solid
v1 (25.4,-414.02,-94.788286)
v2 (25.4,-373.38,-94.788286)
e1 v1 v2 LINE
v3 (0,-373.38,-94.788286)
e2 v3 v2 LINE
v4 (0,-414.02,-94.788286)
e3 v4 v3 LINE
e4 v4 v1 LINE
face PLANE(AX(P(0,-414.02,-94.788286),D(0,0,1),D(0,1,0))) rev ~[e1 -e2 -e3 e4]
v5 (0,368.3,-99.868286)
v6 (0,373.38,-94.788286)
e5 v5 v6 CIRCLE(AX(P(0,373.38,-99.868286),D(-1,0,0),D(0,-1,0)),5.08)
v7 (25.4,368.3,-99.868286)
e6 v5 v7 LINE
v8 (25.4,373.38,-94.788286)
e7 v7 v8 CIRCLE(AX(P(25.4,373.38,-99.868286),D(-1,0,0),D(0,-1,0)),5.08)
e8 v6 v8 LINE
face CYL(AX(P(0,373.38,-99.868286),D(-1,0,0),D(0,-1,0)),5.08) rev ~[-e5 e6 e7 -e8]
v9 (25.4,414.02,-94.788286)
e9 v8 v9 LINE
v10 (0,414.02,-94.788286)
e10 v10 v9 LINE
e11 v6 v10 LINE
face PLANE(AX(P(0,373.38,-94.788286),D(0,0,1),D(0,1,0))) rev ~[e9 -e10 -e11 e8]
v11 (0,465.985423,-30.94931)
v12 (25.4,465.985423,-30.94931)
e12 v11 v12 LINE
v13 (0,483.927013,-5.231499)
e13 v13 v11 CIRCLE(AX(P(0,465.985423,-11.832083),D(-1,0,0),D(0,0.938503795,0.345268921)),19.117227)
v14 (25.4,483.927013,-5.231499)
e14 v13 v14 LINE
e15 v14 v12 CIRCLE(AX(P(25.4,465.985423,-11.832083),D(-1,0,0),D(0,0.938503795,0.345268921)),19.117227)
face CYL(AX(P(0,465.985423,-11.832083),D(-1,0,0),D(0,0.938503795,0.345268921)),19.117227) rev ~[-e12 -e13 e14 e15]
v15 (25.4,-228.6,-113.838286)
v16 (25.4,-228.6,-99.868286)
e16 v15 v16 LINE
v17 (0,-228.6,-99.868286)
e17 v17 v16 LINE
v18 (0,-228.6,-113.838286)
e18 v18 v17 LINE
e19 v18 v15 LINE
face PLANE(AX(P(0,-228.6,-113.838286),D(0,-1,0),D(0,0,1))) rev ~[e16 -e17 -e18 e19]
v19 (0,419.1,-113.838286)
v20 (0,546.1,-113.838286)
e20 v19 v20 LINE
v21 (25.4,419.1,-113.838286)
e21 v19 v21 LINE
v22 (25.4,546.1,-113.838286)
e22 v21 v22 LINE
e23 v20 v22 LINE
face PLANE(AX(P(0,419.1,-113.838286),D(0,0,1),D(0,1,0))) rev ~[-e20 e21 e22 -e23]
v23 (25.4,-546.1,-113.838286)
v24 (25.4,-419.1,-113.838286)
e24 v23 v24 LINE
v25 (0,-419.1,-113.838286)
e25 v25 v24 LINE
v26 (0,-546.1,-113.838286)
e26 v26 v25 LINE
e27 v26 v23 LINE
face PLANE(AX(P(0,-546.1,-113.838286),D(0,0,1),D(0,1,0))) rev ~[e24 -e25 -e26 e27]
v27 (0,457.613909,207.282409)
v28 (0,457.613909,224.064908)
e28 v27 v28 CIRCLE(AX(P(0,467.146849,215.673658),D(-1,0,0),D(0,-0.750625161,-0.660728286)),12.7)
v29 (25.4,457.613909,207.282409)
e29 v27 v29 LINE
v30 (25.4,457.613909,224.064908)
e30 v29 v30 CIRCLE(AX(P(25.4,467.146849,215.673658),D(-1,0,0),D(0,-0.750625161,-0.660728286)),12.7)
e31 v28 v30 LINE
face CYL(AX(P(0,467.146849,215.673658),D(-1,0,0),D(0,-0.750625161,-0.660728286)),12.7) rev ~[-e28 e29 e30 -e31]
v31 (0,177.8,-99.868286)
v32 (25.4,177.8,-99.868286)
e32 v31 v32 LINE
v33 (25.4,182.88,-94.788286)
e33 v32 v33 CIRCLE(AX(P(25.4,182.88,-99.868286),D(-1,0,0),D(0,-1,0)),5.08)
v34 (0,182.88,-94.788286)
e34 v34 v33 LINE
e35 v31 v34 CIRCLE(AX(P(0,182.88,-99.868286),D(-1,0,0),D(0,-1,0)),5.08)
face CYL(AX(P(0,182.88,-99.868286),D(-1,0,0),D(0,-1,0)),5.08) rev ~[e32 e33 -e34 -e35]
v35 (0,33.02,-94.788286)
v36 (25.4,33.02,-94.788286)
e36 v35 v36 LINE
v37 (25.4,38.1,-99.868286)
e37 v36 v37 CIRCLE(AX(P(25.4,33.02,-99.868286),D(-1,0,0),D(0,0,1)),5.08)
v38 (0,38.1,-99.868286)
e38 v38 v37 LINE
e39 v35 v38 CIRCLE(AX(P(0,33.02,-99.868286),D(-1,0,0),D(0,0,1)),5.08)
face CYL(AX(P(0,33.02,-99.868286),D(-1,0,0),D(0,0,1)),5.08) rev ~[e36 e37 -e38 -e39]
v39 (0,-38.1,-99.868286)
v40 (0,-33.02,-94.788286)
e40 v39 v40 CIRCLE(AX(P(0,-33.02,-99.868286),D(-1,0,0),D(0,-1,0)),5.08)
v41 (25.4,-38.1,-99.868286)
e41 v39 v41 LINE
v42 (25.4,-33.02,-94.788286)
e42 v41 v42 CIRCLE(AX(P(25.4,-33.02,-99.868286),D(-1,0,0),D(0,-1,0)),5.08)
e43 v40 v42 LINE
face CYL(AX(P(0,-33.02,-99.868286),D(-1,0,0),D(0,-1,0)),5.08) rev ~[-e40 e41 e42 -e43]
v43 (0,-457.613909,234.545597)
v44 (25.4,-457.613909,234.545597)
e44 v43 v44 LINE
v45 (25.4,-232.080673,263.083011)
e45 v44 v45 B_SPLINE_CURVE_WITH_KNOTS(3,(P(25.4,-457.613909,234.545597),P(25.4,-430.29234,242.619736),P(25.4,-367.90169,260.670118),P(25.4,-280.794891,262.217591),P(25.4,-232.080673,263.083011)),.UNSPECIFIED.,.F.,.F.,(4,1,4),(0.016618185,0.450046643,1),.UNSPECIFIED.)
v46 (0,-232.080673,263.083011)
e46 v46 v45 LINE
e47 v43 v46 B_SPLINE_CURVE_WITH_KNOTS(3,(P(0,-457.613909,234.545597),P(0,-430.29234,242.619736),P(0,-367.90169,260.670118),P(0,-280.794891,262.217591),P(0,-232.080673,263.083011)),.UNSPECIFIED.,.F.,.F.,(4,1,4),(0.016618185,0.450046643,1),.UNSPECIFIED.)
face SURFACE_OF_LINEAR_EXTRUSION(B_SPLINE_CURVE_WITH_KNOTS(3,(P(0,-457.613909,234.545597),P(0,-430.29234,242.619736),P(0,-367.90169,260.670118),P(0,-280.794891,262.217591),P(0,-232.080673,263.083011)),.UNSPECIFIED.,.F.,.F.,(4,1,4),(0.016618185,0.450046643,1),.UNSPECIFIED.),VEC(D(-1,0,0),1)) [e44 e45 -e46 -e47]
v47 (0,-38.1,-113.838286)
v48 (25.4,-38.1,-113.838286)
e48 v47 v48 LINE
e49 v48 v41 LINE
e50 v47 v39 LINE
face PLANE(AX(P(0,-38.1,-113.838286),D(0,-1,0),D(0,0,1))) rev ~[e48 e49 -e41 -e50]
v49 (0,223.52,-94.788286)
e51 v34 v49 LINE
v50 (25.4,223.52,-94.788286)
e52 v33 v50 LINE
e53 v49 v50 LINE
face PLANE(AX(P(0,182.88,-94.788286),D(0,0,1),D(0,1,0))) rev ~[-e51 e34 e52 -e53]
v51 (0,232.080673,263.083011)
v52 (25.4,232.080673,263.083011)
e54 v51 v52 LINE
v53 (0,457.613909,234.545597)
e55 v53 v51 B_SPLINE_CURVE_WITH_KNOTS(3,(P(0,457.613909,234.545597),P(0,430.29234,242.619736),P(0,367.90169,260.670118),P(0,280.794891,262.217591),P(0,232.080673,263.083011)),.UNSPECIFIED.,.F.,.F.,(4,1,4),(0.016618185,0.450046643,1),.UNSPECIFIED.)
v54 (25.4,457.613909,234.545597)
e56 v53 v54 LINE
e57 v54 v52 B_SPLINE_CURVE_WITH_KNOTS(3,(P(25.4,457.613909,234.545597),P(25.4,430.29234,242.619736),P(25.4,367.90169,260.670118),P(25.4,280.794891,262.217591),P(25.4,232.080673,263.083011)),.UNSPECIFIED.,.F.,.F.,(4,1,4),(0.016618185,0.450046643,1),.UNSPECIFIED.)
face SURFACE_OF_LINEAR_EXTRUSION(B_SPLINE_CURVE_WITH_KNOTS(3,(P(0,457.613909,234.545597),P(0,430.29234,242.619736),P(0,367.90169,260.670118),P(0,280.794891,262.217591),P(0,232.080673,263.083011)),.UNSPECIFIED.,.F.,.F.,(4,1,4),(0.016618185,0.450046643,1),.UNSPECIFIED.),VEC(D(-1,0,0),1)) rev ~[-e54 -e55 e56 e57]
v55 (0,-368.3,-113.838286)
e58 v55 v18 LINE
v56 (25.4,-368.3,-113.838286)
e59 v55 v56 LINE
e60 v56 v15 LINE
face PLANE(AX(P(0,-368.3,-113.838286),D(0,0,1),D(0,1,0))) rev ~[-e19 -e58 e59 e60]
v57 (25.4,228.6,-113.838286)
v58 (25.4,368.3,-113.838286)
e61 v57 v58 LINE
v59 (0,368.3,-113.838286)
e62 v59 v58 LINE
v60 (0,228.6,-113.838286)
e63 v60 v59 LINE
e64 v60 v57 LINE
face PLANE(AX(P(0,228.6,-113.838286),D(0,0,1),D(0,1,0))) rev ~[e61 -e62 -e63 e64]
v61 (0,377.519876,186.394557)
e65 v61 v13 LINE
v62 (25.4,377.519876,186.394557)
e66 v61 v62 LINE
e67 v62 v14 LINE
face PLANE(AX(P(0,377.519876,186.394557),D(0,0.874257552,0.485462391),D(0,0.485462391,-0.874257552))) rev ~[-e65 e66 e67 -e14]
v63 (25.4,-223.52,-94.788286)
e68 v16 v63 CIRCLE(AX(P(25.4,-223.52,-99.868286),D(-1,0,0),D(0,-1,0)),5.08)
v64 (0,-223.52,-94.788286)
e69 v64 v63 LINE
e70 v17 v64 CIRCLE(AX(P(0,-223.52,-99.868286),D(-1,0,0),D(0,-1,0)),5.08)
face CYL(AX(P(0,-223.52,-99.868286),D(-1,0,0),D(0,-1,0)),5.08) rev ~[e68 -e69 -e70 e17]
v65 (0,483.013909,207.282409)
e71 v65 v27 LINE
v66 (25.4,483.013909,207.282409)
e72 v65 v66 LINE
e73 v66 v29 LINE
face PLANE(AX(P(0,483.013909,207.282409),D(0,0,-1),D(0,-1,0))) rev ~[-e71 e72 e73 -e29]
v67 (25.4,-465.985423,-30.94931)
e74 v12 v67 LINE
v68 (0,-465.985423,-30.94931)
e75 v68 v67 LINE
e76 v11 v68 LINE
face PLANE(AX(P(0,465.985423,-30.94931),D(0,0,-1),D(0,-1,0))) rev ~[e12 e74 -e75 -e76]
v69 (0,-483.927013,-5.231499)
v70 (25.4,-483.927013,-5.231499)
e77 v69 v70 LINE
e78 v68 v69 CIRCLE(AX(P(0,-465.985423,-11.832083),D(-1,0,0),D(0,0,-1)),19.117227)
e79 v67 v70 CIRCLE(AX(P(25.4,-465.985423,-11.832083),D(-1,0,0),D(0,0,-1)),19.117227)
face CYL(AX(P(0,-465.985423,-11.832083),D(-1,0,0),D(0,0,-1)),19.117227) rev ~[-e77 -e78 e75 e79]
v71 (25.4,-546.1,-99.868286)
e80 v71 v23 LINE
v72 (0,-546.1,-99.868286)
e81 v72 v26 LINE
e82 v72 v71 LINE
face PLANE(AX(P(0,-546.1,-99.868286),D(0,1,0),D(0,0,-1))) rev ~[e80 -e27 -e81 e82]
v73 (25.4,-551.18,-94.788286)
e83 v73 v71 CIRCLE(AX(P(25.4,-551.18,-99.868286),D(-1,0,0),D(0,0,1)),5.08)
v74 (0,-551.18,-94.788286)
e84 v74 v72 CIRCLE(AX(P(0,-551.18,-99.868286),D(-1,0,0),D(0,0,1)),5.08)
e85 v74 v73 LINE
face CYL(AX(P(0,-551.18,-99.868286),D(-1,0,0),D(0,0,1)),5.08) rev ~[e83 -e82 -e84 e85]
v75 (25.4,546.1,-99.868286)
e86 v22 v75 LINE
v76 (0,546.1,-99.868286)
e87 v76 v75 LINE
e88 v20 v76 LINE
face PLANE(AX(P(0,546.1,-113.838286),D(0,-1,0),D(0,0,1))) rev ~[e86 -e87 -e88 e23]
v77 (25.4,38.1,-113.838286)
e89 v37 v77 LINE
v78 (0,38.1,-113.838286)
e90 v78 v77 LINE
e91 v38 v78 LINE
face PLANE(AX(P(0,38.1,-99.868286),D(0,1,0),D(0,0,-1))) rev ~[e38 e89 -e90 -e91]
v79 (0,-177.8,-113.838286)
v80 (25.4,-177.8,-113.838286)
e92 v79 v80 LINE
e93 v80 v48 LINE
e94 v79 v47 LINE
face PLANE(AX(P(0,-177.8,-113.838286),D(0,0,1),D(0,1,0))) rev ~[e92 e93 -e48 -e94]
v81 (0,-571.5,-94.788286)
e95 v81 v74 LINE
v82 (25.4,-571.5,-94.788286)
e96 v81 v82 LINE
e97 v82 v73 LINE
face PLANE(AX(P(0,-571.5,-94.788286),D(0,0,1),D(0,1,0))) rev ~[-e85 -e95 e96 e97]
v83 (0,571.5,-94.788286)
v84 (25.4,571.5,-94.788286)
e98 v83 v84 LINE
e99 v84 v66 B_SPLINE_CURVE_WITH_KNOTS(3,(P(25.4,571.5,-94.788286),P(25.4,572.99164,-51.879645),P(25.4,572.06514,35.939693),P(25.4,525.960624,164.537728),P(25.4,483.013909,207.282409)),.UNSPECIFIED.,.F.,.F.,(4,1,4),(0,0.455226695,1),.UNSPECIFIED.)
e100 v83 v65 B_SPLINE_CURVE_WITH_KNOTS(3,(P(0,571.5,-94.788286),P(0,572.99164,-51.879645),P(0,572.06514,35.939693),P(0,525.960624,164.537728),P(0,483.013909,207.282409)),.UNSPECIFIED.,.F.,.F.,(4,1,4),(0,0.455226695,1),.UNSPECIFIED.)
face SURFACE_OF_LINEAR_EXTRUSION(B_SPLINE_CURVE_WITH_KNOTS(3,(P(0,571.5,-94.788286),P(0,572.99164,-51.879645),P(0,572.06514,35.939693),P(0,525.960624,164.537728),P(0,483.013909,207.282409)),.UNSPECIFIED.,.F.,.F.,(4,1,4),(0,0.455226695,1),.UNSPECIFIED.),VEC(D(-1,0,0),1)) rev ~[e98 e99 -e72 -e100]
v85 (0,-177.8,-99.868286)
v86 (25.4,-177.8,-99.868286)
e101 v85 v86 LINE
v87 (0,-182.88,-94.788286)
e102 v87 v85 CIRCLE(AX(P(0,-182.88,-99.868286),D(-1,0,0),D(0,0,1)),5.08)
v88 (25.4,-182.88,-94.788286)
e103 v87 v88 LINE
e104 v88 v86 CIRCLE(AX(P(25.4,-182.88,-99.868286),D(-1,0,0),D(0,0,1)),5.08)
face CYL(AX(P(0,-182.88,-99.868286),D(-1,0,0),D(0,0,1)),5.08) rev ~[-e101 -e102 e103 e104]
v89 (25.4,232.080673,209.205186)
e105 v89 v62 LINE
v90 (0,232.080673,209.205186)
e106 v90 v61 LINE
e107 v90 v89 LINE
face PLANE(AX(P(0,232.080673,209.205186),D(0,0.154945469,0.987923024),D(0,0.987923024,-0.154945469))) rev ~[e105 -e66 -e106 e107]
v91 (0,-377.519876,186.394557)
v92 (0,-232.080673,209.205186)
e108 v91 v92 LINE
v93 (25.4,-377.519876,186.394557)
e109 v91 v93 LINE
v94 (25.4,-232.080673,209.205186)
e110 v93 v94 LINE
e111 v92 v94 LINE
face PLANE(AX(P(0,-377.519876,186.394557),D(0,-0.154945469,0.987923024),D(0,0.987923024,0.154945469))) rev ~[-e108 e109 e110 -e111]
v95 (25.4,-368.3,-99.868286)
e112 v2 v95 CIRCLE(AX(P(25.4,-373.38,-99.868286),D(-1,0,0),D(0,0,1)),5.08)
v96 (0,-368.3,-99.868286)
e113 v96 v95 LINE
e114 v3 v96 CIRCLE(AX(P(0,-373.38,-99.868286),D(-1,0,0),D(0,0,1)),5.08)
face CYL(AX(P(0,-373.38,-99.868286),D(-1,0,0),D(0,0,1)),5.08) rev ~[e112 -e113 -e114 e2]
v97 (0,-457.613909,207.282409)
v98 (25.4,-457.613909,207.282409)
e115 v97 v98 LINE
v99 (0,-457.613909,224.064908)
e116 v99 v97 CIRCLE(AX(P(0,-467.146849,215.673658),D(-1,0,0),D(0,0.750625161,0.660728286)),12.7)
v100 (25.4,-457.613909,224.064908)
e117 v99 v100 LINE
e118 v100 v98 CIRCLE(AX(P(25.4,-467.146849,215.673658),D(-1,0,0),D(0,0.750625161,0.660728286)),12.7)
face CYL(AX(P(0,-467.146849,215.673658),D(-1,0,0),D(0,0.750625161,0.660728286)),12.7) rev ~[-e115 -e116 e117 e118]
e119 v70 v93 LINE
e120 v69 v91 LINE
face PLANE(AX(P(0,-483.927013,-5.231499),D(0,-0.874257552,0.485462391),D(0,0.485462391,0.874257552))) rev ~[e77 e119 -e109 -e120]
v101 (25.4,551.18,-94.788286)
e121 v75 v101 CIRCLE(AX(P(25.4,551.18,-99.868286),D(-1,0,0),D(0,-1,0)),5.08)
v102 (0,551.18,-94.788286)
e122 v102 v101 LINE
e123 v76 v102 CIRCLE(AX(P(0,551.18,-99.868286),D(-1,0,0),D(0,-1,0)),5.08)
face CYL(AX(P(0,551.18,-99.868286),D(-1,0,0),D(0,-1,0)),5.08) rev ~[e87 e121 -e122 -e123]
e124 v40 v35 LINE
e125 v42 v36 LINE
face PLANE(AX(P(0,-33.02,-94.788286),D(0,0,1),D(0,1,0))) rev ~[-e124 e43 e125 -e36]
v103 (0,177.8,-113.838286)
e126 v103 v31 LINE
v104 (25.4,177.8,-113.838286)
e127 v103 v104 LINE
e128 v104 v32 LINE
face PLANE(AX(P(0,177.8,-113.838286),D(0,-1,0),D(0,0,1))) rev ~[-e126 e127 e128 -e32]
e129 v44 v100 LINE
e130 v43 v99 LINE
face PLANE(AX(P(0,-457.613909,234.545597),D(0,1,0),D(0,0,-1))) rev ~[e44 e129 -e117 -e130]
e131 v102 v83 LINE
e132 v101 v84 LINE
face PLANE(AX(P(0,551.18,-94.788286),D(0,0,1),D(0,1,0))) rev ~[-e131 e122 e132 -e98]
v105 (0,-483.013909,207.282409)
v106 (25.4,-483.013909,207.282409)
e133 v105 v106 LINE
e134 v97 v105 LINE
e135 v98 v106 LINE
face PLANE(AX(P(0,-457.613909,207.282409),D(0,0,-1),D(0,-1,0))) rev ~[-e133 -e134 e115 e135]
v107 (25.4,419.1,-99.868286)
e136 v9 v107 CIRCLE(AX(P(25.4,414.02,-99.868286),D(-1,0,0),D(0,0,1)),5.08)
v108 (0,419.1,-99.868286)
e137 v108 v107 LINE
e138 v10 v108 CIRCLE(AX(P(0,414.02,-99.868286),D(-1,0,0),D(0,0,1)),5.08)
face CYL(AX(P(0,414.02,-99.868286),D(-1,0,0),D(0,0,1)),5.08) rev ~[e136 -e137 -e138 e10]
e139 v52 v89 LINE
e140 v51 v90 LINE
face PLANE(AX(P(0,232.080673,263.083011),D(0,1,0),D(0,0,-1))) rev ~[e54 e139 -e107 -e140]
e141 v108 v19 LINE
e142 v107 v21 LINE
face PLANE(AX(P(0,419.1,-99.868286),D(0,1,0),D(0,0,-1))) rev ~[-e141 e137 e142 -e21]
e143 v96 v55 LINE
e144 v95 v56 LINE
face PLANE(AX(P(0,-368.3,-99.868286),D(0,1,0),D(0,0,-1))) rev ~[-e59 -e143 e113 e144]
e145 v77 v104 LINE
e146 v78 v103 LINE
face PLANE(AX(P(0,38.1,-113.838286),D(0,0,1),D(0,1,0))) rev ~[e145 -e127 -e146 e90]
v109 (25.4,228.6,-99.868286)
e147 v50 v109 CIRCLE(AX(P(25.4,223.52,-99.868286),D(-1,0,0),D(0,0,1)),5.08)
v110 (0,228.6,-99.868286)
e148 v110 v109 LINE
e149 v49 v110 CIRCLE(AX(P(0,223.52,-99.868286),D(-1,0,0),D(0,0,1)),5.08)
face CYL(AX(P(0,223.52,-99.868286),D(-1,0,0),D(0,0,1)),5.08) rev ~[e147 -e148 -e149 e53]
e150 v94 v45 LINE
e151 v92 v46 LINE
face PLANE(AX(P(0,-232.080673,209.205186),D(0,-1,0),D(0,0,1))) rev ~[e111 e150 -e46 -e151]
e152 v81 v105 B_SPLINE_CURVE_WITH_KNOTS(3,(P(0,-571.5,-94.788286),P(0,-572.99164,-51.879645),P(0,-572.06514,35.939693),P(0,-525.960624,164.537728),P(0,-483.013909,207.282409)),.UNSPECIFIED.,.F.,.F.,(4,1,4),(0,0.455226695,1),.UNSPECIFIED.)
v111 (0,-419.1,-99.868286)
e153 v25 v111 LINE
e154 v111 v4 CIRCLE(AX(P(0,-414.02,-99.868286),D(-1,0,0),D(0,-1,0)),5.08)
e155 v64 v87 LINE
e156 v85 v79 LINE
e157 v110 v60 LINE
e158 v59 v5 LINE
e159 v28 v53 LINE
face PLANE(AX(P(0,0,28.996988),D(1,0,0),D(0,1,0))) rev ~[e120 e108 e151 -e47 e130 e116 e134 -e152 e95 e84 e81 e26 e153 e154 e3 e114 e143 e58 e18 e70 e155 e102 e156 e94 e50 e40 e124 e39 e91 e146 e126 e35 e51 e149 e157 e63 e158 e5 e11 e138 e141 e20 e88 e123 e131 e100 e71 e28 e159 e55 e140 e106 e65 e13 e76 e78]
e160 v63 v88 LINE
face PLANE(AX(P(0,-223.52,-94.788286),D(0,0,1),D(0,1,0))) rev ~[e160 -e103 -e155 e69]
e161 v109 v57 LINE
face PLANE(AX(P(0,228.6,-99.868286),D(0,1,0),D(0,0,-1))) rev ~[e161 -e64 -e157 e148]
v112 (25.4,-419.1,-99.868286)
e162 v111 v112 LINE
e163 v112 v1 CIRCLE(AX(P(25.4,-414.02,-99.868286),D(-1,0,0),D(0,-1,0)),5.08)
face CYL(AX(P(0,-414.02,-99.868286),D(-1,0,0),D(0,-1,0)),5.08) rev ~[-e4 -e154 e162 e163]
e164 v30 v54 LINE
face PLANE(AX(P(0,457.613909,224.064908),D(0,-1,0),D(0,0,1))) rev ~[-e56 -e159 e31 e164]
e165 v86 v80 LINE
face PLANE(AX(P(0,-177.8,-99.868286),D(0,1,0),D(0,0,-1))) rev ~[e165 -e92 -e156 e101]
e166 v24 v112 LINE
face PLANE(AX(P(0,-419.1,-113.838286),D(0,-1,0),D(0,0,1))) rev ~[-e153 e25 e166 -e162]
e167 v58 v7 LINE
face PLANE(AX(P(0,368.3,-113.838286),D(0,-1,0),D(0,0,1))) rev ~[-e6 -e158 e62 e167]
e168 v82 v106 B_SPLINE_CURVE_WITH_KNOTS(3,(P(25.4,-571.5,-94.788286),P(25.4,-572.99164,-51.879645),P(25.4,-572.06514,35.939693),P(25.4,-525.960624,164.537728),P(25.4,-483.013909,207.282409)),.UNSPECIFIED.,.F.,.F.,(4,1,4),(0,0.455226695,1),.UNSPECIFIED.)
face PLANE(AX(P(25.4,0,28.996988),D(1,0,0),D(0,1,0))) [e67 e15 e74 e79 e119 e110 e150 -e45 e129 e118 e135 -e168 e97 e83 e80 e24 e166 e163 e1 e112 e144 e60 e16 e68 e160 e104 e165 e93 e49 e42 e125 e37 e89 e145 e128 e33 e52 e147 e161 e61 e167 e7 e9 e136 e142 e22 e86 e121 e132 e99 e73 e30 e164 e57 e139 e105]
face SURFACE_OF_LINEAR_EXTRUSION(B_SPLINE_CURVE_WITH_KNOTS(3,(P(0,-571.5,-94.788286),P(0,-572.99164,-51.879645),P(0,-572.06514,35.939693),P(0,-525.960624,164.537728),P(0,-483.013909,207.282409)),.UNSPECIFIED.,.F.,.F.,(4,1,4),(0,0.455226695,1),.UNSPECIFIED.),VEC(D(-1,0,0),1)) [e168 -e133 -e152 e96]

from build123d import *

# Parameters (mm, degrees)
F1_DEPTH = 25.4


with BuildPart() as f1:
    # F0 (on Right) → F1 (new body)
    with BuildSketch(Plane.YZ):
        with BuildLine():
            Line((-33.02, -94.7882861604), (0, -94.7882861604))
            Line((0, -94.7882861604), (33.02, -94.7882861604))
            ThreePointArc((33.02, -94.7882861604), (36.6121024484, -96.276183712), (38.1, -99.8682861604))
            Line((38.1, -99.8682861604), (38.1, -113.8382861604))
            Line((38.1, -113.8382861604), (177.8, -113.8382861604))
            Line((177.8, -113.8382861604), (177.8, -99.8682861604))
            ThreePointArc((177.8, -99.8682861604), (179.2878975516, -96.276183712), (182.88, -94.7882861604))
            Line((182.88, -94.7882861604), (223.52, -94.7882861604))
            ThreePointArc((223.52, -94.7882861604), (227.1121024484, -96.276183712), (228.6, -99.8682861604))
            Line((228.6, -99.8682861604), (228.6, -113.8382861604))
            Line((228.6, -113.8382861604), (368.3, -113.8382861604))
            Line((368.3, -113.8382861604), (368.3, -99.8682861604))
            ThreePointArc((368.3, -99.8682861604), (369.7878975516, -96.276183712), (373.38, -94.7882861604))
            Line((373.38, -94.7882861604), (414.02, -94.7882861604))
            ThreePointArc((414.02, -94.7882861604), (417.6121024484, -96.276183712), (419.1, -99.8682861604))
            Line((419.1, -99.8682861604), (419.1, -113.8382861604))
            Line((419.1, -113.8382861604), (546.1, -113.8382861604))
            Line((546.1, -113.8382861604), (546.1, -99.8682861604))
            ThreePointArc((546.1, -99.8682861604), (547.5878975516, -96.276183712), (551.18, -94.7882861604))
            Line((551.18, -94.7882861604), (571.5, -94.7882861604))
            add(Edge.make_bspline(
                [(571.5, -94.7882861604), (572.9916402115, -51.8796445459), (572.0651404012, 35.9396927338), (525.960624218, 164.5377278328), (483.0139090485, 207.2824090719)],
                knots=[0, 0, 0, 0, 0.455226695, 1, 1, 1, 1], degree=3))
            Line((483.0139090485, 207.2824090719), (457.6139090485, 207.2824090719))
            ThreePointArc((457.6139090485, 207.2824090719), (454.4468485925, 215.6736583026), (457.6139090485, 224.0649075333))
            Line((457.6139090485, 224.0649075333), (457.6139090485, 234.5455965156))
            add(Edge.make_bspline(
                [(457.6139090485, 234.5455965156), (430.2923400603, 242.6197356959), (367.9016901724, 260.6701177346), (280.7948912625, 262.2175910558), (232.0806728363, 263.0830109119)],
                knots=[0.0166181854, 0.0166181854, 0.0166181854, 0.0166181854, 0.4500466426, 1, 1, 1, 1], degree=3))
            Line((232.0806728363, 263.0830109119), (232.0806728363, 209.2051863447))
            Line((232.0806728363, 209.2051863447), (377.5198757648, 186.3945573568))
            Line((377.5198757648, 186.3945573568), (483.9270131228, -5.2314990347))
            ThreePointArc((483.9270131228, -5.2314990347), (481.6642820093, -22.7701705112), (465.9854230078, -30.9493104209))
            Line((465.9854230078, -30.9493104209), (0, -30.9493104209))
            Line((0, -30.9493104209), (-465.9854230078, -30.9493104209))
            ThreePointArc((-465.9854230078, -30.9493104209), (-481.6642820093, -22.7701705112), (-483.9270131228, -5.2314990347))
            Line((-483.9270131228, -5.2314990347), (-377.5198757648, 186.3945573568))
            Line((-377.5198757648, 186.3945573568), (-232.0806728363, 209.2051863447))
            Line((-232.0806728363, 209.2051863447), (-232.0806728363, 263.0830109119))
            add(Edge.make_bspline(
                [(-457.6139090485, 234.5455965156), (-430.2923400603, 242.6197356959), (-367.9016901724, 260.6701177346), (-280.7948912625, 262.2175910558), (-232.0806728363, 263.0830109119)],
                knots=[0.0166181854, 0.0166181854, 0.0166181854, 0.0166181854, 0.4500466426, 1, 1, 1, 1], degree=3))
            Line((-457.6139090485, 234.5455965156), (-457.6139090485, 224.0649075333))
            ThreePointArc((-457.6139090485, 224.0649075333), (-454.4468485925, 215.6736583026), (-457.6139090485, 207.2824090719))
            Line((-457.6139090485, 207.2824090719), (-483.0139090485, 207.2824090719))
            add(Edge.make_bspline(
                [(-571.5, -94.7882861604), (-572.9916402115, -51.8796445459), (-572.0651404012, 35.9396927338), (-525.960624218, 164.5377278328), (-483.0139090485, 207.2824090719)],
                knots=[0, 0, 0, 0, 0.455226695, 1, 1, 1, 1], degree=3))
            Line((-571.5, -94.7882861604), (-551.18, -94.7882861604))
            ThreePointArc((-551.18, -94.7882861604), (-547.5878975516, -96.276183712), (-546.1, -99.8682861604))
            Line((-546.1, -99.8682861604), (-546.1, -113.8382861604))
            Line((-546.1, -113.8382861604), (-419.1, -113.8382861604))
            Line((-419.1, -113.8382861604), (-419.1, -99.8682861604))
            ThreePointArc((-419.1, -99.8682861604), (-417.6121024484, -96.276183712), (-414.02, -94.7882861604))
            Line((-414.02, -94.7882861604), (-373.38, -94.7882861604))
            ThreePointArc((-373.38, -94.7882861604), (-369.7878975516, -96.276183712), (-368.3, -99.8682861604))
            Line((-368.3, -99.8682861604), (-368.3, -113.8382861604))
            Line((-368.3, -113.8382861604), (-228.6, -113.8382861604))
            Line((-228.6, -113.8382861604), (-228.6, -99.8682861604))
            ThreePointArc((-228.6, -99.8682861604), (-227.1121024484, -96.276183712), (-223.52, -94.7882861604))
            Line((-223.52, -94.7882861604), (-182.88, -94.7882861604))
            ThreePointArc((-182.88, -94.7882861604), (-179.2878975516, -96.276183712), (-177.8, -99.8682861604))
            Line((-177.8, -99.8682861604), (-177.8, -113.8382861604))
            Line((-177.8, -113.8382861604), (-38.1, -113.8382861604))
            Line((-38.1, -113.8382861604), (-38.1, -99.8682861604))
            ThreePointArc((-38.1, -99.8682861604), (-36.6121024484, -96.276183712), (-33.02, -94.7882861604))
        make_face()
    extrude(amount=F1_DEPTH)


solid = f1.part
